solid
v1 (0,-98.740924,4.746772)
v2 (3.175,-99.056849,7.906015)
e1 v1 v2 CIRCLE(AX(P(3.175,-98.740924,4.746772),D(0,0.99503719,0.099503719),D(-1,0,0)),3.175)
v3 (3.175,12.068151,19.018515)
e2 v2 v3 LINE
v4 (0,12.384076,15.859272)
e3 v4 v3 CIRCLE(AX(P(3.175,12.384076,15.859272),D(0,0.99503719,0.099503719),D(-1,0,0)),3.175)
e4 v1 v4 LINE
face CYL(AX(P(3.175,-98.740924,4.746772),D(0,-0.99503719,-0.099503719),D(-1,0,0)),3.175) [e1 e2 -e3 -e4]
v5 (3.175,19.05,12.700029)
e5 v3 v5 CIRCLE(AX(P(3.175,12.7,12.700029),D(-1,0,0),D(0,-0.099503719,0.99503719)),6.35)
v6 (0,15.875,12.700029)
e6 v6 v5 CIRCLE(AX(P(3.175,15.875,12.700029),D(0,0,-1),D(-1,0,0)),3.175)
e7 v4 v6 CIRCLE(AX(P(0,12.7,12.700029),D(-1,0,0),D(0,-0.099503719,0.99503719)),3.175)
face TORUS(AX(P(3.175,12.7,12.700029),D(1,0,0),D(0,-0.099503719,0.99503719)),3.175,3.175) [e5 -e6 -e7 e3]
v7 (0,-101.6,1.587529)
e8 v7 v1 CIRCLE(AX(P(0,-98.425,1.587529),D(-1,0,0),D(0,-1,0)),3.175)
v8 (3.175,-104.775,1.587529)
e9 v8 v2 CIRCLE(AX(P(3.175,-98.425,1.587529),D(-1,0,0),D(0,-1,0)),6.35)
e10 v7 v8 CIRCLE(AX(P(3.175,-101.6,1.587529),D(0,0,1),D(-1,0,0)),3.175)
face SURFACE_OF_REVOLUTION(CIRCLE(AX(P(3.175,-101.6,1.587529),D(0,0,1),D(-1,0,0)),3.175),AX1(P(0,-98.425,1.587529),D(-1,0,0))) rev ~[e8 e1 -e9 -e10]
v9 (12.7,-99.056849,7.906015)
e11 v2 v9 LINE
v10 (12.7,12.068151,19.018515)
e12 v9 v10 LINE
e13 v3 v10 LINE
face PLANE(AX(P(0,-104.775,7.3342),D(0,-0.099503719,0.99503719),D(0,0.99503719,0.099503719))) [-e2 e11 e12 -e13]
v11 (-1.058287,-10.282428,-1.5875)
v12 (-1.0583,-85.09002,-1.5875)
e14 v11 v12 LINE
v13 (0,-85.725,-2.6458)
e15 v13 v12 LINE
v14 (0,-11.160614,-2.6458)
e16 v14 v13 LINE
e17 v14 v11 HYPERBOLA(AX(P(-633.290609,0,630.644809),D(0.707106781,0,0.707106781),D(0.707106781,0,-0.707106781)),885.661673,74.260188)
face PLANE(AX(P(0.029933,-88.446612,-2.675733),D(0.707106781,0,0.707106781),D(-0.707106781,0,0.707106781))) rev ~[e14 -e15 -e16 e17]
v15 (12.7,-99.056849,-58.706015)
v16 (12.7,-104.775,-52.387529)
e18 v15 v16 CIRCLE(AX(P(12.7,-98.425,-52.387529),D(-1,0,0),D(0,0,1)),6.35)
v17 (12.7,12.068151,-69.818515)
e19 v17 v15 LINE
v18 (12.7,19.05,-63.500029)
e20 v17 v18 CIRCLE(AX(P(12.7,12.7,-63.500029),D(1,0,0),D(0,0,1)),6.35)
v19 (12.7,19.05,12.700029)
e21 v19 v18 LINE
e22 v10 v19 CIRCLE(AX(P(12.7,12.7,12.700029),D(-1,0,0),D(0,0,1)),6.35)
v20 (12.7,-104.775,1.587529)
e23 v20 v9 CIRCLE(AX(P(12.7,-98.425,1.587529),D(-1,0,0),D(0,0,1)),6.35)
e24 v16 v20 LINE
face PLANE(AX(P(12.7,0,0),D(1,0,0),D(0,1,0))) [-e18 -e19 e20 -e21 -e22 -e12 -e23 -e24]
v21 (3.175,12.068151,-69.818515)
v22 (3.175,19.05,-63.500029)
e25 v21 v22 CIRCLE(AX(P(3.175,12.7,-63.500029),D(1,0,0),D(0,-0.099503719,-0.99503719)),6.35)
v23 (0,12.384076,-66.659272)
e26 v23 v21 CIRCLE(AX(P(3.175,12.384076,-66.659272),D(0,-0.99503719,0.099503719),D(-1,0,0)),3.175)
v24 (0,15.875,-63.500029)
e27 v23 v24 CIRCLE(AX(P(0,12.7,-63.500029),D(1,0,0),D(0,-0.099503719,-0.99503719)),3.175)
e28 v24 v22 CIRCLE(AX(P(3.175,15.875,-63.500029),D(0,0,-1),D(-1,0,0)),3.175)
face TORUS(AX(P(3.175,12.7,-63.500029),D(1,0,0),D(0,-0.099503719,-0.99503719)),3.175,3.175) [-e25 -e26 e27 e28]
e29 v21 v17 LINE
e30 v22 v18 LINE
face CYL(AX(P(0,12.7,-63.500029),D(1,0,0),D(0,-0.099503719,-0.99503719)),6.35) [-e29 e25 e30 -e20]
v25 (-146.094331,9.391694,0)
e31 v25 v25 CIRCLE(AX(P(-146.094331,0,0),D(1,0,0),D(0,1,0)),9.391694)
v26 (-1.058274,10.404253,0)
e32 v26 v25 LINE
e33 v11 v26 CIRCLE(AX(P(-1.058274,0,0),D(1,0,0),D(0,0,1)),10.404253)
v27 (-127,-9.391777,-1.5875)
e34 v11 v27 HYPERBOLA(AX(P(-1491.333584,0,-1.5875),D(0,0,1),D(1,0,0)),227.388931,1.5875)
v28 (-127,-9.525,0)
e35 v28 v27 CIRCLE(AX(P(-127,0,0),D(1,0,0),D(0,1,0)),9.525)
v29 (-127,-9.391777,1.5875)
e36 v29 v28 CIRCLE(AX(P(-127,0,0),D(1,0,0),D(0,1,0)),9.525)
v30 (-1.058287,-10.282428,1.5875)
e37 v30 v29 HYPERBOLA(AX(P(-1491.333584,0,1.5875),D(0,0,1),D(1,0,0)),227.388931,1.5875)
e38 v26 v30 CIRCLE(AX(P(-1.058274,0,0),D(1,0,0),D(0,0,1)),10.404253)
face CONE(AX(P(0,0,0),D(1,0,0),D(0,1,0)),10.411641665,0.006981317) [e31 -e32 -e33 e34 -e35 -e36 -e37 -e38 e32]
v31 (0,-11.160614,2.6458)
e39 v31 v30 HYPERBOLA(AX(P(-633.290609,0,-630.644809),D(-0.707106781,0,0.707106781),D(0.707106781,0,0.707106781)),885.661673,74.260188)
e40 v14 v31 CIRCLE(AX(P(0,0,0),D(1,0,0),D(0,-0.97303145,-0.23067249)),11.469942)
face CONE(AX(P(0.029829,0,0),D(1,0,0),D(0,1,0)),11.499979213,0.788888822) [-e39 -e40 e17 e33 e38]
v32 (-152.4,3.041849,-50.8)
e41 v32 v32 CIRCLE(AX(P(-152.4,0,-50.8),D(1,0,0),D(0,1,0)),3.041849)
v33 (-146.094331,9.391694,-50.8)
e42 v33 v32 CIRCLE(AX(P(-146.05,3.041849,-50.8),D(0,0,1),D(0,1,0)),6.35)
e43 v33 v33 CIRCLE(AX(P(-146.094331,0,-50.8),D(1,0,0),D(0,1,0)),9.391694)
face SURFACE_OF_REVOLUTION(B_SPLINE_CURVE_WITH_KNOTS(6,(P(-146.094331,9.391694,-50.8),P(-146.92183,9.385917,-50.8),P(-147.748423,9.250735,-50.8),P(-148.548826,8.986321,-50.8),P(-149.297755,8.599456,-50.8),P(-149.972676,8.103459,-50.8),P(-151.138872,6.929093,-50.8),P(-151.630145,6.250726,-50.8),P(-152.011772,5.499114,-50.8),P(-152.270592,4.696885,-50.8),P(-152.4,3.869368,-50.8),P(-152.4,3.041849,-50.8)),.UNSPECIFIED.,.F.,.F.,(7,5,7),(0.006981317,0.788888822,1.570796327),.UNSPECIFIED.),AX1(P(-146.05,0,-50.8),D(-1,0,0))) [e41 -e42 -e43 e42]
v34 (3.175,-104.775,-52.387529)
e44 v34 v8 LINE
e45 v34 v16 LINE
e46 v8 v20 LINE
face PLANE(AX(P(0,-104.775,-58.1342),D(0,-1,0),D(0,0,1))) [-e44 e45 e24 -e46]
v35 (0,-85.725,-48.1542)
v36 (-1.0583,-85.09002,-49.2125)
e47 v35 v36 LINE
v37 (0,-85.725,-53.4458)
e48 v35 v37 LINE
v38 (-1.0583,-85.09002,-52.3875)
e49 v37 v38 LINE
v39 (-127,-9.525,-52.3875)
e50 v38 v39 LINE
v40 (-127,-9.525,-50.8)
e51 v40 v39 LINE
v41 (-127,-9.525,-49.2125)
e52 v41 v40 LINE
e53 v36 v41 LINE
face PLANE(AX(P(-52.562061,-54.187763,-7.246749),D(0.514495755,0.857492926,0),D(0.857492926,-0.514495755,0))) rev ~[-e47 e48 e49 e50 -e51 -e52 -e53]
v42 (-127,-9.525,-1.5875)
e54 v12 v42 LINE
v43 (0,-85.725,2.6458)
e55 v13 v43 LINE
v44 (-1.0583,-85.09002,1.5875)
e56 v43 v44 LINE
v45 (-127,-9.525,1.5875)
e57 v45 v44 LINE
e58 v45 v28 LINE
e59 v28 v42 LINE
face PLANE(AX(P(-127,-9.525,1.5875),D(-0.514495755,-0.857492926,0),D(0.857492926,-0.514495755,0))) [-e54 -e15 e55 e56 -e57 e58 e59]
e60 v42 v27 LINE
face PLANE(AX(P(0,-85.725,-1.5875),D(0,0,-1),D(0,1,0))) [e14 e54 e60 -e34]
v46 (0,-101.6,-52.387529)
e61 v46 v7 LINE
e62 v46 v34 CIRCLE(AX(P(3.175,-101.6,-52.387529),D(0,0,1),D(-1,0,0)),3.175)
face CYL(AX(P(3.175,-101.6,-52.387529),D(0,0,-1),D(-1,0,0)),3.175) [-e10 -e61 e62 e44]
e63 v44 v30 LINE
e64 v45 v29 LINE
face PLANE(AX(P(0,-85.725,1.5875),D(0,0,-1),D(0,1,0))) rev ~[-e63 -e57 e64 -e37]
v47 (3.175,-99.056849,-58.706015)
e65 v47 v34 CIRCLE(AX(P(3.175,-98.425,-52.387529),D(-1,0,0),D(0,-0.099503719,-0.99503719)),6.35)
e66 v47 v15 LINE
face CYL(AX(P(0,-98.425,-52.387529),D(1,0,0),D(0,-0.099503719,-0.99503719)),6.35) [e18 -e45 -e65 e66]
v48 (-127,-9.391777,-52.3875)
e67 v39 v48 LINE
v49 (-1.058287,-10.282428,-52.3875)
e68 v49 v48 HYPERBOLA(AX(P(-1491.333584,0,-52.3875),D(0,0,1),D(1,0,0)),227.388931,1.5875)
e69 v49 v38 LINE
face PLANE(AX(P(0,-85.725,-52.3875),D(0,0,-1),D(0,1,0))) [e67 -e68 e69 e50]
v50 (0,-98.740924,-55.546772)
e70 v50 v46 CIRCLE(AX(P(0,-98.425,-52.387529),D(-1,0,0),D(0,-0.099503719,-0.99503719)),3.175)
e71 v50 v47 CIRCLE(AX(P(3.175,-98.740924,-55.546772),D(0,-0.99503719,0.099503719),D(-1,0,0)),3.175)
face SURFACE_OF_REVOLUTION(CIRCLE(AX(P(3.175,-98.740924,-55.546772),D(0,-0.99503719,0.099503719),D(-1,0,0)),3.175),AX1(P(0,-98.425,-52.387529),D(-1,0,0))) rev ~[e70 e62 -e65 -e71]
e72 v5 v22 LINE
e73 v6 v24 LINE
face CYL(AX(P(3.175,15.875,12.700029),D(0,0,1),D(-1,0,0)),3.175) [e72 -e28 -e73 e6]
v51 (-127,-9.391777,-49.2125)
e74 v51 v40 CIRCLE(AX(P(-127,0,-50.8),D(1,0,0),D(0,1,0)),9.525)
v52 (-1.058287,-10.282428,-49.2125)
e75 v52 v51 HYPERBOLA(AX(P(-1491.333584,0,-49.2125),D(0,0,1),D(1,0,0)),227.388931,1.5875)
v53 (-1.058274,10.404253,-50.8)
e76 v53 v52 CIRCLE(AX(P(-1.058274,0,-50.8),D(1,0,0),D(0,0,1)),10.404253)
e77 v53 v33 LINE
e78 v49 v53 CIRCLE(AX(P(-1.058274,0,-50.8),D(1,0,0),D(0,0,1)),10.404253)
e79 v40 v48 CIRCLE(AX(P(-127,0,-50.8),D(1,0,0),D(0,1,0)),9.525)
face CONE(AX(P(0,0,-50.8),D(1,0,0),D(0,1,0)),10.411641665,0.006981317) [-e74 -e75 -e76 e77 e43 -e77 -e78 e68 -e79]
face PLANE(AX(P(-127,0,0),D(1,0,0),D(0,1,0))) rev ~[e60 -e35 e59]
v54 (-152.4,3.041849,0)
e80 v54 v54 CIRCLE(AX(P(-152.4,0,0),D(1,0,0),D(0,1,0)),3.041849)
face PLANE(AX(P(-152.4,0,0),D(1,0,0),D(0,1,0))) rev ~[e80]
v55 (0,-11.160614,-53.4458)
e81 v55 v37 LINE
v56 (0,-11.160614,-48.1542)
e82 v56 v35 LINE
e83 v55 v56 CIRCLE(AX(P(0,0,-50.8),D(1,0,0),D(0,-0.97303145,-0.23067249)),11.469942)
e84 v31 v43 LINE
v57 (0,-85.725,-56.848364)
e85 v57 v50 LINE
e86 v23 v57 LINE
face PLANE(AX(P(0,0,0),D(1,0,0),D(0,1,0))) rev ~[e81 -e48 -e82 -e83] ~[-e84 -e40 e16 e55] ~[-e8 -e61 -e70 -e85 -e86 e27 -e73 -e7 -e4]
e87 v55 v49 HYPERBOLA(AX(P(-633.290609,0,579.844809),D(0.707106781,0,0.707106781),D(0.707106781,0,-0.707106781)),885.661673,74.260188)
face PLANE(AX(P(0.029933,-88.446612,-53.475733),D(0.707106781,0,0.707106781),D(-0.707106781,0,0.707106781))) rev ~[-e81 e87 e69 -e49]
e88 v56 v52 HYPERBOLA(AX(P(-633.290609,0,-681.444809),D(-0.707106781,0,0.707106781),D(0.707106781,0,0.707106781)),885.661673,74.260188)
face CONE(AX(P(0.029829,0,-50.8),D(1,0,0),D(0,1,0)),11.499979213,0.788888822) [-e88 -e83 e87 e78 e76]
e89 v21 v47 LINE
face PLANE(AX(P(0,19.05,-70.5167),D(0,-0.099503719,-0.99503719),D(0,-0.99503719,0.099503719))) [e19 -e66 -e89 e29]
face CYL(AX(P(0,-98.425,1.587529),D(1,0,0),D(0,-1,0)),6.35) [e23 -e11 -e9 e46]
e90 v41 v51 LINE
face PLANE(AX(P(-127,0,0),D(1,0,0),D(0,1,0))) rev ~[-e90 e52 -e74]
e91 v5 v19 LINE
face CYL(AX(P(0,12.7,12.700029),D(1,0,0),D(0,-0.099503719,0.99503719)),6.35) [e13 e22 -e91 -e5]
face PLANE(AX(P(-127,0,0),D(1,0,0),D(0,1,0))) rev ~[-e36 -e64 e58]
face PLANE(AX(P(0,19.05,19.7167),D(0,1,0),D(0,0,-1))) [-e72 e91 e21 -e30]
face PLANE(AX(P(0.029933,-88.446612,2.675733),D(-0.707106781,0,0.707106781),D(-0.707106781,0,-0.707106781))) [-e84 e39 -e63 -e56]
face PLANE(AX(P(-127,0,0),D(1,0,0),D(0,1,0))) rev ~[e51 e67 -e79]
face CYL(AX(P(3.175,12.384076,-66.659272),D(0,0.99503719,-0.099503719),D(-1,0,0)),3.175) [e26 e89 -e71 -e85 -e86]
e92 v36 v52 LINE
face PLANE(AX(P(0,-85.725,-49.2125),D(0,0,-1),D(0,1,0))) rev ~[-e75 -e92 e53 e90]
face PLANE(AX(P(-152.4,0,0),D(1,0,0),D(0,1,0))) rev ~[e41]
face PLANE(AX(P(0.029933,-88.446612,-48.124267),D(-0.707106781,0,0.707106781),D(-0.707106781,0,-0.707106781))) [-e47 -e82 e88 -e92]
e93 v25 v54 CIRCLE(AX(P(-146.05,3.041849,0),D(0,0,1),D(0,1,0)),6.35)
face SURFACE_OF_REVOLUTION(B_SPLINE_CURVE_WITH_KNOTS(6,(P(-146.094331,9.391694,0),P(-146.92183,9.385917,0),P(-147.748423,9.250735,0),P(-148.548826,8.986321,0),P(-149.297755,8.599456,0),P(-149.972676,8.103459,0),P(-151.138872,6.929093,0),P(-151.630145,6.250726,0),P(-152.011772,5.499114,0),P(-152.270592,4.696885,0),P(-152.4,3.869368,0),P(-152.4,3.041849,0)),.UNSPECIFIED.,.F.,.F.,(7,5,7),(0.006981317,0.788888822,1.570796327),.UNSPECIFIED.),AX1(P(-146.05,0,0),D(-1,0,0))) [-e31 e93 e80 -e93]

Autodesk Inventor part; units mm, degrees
ref_plane "YZ Plane" through (0, 0, 0) normal (1, 0, 0) x (0, 1, 0)
ref_plane "XZ Plane" through (0, 0, 0) normal (0, 1, 0) x (-1, 0, 0)
ref_plane "XY Plane" through (0, 0, 0) normal (0, 0, 1) x (1, 0, 0)
sketch "Sketch3" plane through (0, 0, 0) normal (1, 0, 0) x (0, 1, 0)
  line L0 (-85.725, 0) -> (-85.725, -1.5875)
  line L1 (-85.725, -1.5875) -> (-85.725, 1.5875)
  line L2 (-85.725, 1.5875) -> (-9.3918, 1.5875)
  line L3 (-85.725, -1.5875) -> (-9.3918, -1.5875)
  line L4 (-85.725, -50.8) -> (-85.725, -49.2125)
  line L5 (-85.725, -49.2125) -> (-85.725, -52.3875)
  line L6 (-85.725, -52.3875) -> (-9.3918, -52.3875)
  line L7 (-85.725, -49.2125) -> (-9.3918, -49.2125)
  circle A0 centre (0, 0) radius 9.525
  circle A1 centre (0, -50.8) radius 9.525
  line L8 (-98.425, 1.5875) -> (12.7, 12.7)
  line L9 (-98.425, -52.3875) -> (12.7, -63.5)
  line L10 (12.7, 12.7) -> (12.7, -63.5)
  line L11 (-98.425, -52.3875) -> (-98.425, 1.5875)
  line L12 (19.05, -70.5167) -> (-104.775, -58.1342)
  line L13 (-104.775, -58.1342) -> (-104.775, 7.3342)
  line L14 (-104.775, 7.3342) -> (19.05, 19.7167)
  line L15 (19.05, 19.7167) -> (19.05, -70.5167)
  dimension "d14" = 1.5875
  dimension "d15" = 3.175
  dimension "d40" = 6.35
extrude "Extrusion2" add sketch "Sketch3" along normal blind 12.7 contours L1 L2 A0 L3 L0 | A0 | L4 L7 A1 L6 L5 | A1 | L8 L10 L9 L11 | L12 L13 L14 L15
extrude "Extrusion3" add sketch "Sketch3" against normal blind 152.4 contours A0 | A1
extrude "Extrusion4" add sketch "Sketch3" against normal blind 127 contours L1 L2 A0 L3 L0 | L4 L7 A1 L6 L5
sketch "Sketch4" plane through (-127, -9.3918, 1.5875) normal (0, 0, 1) x (1, 0, 0)
  line L0 (0, -0.1332) -> (-25.4, -0.1332) projected
  line L1 (127, -76.3332) -> (0, -76.3332) projected
  line L2 (0, -0.1332) -> (127, -76.3332)
  line L3 (127, -76.3332) -> (0, -76.3332)
  line L4 (0, 0) -> (0, -0.1332) projected
  line L5 (0, -76.3332) -> (0, -0.1332)
  point P0 (127, 9.3918)
extrude "Extrusion5" cut sketch "Sketch4" against normal blind 127
draft "FaceDraft2" angle 0.4 pull direction (-1, 0, 0) faces at (-93.1333, -8.9299, 3.314) fixed edges at (-127, -9.4916, -0.7965) (-127, -9.4916, 0.7965)
draft "FaceDraft3" angle 0.4 pull direction (-1, 0, 0) faces at (-93.1333, -8.9299, -47.486) fixed edges at (-127, -9.4916, -51.5965) (-127, -9.4916, -50.0035)
fillet "Fillet3" radius 6.35 2 edges at (-152.4, -9.3477, 0) (-152.4, -9.3477, -50.8)
fillet "Fillet5" radius 6.35 4 edges at (6.35, 19.05, -70.5167) (6.35, 19.05, 19.7167) (6.35, -104.775, -58.1342) (6.35, -104.775, 7.3342)
fillet "Fillet6" radius 3.175 9 edges at (0, -103.1332, 5.8484) (0, -104.775, -25.4) (0, -103.1332, -56.6484) (0, -36.8284, -64.9288) (0, -92.3909, -59.3726) (0, 16.9609, -68.2082) (0, 19.05, -25.4) (0, 16.9609, 17.4082) (0, -43.4943, 13.4622)
chamfer "Chamfer1" distance 1.0583 angle 45 8 edges at (0, 0.7961, -40.4188) (0, 0.7961, -61.1812) (0, -48.0075, -52.3875) (0, 0.7961, 10.3812) (0, 0.7961, -10.3812) (0, -48.0075, -1.5875) (0, -48.0075, -49.2125) (0, -48.0075, 1.5875)
properties part number "Ski Rack"
